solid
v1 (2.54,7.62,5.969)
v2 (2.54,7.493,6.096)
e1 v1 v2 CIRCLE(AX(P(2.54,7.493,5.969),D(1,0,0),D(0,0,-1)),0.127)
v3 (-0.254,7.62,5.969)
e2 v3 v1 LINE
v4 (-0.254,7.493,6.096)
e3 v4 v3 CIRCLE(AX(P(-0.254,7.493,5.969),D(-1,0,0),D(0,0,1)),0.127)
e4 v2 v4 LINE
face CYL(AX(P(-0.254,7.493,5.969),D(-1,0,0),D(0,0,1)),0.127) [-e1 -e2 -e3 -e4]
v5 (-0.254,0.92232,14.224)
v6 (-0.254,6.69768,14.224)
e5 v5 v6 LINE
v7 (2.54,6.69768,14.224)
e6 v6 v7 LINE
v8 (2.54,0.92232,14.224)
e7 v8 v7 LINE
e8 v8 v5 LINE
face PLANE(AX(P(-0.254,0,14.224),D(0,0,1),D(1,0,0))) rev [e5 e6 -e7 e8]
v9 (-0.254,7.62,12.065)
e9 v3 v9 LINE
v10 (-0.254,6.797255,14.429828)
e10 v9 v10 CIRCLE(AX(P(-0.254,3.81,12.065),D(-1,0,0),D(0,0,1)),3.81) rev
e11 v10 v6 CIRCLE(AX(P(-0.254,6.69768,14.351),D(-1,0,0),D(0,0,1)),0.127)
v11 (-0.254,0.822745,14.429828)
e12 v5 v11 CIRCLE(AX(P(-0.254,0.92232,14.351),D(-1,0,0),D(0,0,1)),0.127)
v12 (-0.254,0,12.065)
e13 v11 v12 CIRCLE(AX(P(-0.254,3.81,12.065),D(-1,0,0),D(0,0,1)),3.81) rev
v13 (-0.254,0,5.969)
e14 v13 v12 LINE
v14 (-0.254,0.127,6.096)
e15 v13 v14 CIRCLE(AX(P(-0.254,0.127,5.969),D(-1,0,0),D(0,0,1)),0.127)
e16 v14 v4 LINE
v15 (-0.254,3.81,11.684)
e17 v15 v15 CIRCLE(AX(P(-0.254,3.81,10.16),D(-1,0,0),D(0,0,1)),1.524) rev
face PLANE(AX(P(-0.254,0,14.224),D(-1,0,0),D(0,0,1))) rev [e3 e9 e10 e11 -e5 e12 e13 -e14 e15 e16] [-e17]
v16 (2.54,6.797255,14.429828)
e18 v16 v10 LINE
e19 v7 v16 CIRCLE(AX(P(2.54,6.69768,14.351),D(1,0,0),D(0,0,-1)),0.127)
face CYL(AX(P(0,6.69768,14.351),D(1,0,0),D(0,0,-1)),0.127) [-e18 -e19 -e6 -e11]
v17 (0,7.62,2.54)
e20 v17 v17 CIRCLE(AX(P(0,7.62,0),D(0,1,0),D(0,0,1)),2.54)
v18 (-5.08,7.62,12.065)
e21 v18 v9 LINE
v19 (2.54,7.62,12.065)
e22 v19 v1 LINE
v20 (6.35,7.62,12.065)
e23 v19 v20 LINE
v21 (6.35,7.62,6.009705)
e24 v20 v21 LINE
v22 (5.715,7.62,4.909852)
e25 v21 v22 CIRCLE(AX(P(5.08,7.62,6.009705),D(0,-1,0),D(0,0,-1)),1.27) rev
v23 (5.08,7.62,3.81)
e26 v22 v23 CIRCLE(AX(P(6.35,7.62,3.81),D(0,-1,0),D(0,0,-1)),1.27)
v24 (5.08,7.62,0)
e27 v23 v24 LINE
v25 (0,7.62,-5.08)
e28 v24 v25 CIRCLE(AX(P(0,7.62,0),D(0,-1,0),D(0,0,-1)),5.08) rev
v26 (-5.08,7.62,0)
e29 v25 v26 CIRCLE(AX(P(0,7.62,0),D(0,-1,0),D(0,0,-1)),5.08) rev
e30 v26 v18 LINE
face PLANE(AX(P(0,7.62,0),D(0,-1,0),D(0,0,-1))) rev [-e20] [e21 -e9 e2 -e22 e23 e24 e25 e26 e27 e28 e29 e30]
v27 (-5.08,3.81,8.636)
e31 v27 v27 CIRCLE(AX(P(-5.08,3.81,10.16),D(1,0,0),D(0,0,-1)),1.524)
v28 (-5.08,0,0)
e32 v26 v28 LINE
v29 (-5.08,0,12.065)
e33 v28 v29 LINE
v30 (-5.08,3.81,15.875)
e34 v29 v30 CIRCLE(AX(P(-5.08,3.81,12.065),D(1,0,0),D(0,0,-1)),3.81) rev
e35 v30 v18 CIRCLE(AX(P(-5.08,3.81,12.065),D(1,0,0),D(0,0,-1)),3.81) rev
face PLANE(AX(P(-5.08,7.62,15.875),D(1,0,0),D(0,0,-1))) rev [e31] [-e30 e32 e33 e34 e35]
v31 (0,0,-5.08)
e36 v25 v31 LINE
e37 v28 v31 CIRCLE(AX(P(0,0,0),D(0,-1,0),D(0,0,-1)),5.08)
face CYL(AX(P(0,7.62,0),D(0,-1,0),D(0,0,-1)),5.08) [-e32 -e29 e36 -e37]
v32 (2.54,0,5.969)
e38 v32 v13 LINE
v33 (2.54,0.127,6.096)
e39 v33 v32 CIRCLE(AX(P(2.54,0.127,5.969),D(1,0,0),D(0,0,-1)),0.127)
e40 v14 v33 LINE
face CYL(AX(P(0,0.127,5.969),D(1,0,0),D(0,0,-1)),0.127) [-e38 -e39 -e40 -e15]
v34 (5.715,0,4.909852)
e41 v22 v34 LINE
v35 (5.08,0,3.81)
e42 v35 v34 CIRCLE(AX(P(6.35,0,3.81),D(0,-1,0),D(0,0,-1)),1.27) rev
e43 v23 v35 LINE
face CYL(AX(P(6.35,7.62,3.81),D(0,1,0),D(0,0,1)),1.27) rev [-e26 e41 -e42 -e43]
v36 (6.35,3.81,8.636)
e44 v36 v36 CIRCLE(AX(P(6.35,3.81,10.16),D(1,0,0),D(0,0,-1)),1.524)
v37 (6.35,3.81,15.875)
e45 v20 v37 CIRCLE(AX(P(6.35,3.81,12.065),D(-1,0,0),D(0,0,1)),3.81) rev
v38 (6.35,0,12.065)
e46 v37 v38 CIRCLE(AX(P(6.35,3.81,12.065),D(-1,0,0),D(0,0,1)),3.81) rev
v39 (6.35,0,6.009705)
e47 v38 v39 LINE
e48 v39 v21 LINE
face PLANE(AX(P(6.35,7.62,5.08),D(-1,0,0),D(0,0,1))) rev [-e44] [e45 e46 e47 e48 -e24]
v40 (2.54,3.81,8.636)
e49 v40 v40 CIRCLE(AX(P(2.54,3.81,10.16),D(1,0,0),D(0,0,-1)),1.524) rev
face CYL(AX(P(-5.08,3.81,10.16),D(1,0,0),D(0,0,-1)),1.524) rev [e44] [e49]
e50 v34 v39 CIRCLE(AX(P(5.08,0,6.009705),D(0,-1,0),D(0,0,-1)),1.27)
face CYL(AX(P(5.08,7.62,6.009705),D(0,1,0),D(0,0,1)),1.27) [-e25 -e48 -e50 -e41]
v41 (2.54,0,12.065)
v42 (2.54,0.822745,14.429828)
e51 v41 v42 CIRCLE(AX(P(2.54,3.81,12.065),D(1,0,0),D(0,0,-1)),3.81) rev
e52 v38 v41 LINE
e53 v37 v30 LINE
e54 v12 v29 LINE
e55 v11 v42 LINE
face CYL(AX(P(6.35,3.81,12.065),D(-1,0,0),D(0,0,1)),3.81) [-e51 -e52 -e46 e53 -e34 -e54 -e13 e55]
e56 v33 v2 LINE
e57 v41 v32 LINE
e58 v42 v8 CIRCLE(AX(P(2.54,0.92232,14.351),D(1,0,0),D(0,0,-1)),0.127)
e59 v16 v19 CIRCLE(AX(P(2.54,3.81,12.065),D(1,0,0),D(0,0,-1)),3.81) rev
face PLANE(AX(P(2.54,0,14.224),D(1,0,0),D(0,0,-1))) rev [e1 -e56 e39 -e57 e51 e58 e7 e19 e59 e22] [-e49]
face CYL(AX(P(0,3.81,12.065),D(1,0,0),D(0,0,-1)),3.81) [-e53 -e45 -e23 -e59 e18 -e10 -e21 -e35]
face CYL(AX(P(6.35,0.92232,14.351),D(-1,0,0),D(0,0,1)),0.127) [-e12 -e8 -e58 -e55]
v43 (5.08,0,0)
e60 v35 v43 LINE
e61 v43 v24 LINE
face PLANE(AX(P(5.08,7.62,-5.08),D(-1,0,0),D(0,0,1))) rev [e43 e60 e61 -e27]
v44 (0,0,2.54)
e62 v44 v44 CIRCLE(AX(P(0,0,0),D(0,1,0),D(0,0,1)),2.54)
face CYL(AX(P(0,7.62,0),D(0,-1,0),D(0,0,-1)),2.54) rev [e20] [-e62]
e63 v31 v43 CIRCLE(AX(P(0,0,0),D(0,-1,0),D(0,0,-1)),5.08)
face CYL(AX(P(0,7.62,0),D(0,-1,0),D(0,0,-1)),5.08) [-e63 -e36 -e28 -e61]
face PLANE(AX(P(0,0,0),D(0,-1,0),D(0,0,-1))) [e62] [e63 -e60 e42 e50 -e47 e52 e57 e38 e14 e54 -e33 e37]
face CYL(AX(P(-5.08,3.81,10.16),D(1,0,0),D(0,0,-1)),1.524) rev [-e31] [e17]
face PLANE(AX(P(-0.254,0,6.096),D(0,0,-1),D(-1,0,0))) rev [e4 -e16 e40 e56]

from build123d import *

# Parameters (mm, degrees)
SKETCH1_R           = 2.54
BOSS_EXTRUDE1_DEPTH = 7.62
SKETCH2_R           = 1.524
CUT_EXTRUDE1_DEPTH  = 21.993449574
FILLET1_R           = 5.08
FILLET4_R           = 3.81
FILLET2_R           = 1.27
FILLET3_R           = 1.27
SKETCH3_W           = 2.794
SKETCH3_H           = 8.128
CUT_EXTRUDE2_DEPTH  = 19.719041935
FILLET5_R           = 0.127


with BuildPart() as part:
    # Sketch1 → Boss-Extrude1 (new body)
    with BuildSketch(Plane(origin=(0, 0, 0), x_dir=(1, 0, 0), z_dir=(0, 1, 0))):
        Polygon((-5.08, 5.08), (5.08, 5.08), (5.08, -5.08), (6.35, -5.08), (6.35, -15.875), (-5.08, -15.875), align=None)
        with Locations(Location((0, 0, 0), (0, 0, 270))):
            Circle(SKETCH1_R, mode=Mode.SUBTRACT)
    extrude(amount=BOSS_EXTRUDE1_DEPTH)

    # Sketch2 → Cut-Extrude1 (cut, through all)
    with BuildSketch(Plane(origin=(6.35, 0, 0), x_dir=(0, 0, -1), z_dir=(1, 0, 0))):
        with Locations((-10.16, 3.81)):
            Circle(SKETCH2_R)
    extrude(amount=-CUT_EXTRUDE1_DEPTH, mode=Mode.SUBTRACT)

    # Fillet1
    fillet1_edges = [part.edges().sort_by_distance(p)[0] for p in [
        (-5.08, 3.81, -5.08),
        (5.08, 3.81, -5.08),
    ]]
    fillet(fillet1_edges, radius=FILLET1_R - 0.0001)  # a hair under: the kernel refuses the full size

    # Fillet4
    fillet4_edges = [part.edges().sort_by_distance(p)[0] for p in [
        (0.635, 0, 15.875),
        (0.635, 7.62, 15.875),
    ]]
    fillet(fillet4_edges, radius=FILLET4_R - 0.0001)  # a hair under: the kernel refuses the full size

    # Fillet2
    fillet2_edges = [part.edges().sort_by_distance(p)[0] for p in [
        (5.08, 3.81, 5.08),
    ]]
    fillet(fillet2_edges, radius=FILLET2_R - 0.0001)  # a hair under: the kernel refuses the full size

    # Fillet3
    fillet3_edges = [part.edges().sort_by_distance(p)[0] for p in [
        (6.35, 3.81, 5.08),
    ]]
    fillet(fillet3_edges, radius=FILLET3_R)

    # Sketch3 → Cut-Extrude2 (cut, through all)
    with BuildSketch(Plane(origin=(0, 7.62, 0), x_dir=(1, 0, 0), z_dir=(0, 1, 0))):
        with Locations((1.143, -10.16)):
            Rectangle(SKETCH3_W, SKETCH3_H)
    extrude(amount=-CUT_EXTRUDE2_DEPTH, mode=Mode.SUBTRACT)

    # Fillet5
    fillet5_edges = [part.edges().sort_by_distance(p)[0] for p in [
        (1.143, 0.670713991, 14.224),
        (1.143, 7.62, 6.096),
        (1.143, 6.949286009, 14.224),
        (1.143, 0, 6.096),
    ]]
    fillet(fillet5_edges, radius=FILLET5_R)


solid = part.part
